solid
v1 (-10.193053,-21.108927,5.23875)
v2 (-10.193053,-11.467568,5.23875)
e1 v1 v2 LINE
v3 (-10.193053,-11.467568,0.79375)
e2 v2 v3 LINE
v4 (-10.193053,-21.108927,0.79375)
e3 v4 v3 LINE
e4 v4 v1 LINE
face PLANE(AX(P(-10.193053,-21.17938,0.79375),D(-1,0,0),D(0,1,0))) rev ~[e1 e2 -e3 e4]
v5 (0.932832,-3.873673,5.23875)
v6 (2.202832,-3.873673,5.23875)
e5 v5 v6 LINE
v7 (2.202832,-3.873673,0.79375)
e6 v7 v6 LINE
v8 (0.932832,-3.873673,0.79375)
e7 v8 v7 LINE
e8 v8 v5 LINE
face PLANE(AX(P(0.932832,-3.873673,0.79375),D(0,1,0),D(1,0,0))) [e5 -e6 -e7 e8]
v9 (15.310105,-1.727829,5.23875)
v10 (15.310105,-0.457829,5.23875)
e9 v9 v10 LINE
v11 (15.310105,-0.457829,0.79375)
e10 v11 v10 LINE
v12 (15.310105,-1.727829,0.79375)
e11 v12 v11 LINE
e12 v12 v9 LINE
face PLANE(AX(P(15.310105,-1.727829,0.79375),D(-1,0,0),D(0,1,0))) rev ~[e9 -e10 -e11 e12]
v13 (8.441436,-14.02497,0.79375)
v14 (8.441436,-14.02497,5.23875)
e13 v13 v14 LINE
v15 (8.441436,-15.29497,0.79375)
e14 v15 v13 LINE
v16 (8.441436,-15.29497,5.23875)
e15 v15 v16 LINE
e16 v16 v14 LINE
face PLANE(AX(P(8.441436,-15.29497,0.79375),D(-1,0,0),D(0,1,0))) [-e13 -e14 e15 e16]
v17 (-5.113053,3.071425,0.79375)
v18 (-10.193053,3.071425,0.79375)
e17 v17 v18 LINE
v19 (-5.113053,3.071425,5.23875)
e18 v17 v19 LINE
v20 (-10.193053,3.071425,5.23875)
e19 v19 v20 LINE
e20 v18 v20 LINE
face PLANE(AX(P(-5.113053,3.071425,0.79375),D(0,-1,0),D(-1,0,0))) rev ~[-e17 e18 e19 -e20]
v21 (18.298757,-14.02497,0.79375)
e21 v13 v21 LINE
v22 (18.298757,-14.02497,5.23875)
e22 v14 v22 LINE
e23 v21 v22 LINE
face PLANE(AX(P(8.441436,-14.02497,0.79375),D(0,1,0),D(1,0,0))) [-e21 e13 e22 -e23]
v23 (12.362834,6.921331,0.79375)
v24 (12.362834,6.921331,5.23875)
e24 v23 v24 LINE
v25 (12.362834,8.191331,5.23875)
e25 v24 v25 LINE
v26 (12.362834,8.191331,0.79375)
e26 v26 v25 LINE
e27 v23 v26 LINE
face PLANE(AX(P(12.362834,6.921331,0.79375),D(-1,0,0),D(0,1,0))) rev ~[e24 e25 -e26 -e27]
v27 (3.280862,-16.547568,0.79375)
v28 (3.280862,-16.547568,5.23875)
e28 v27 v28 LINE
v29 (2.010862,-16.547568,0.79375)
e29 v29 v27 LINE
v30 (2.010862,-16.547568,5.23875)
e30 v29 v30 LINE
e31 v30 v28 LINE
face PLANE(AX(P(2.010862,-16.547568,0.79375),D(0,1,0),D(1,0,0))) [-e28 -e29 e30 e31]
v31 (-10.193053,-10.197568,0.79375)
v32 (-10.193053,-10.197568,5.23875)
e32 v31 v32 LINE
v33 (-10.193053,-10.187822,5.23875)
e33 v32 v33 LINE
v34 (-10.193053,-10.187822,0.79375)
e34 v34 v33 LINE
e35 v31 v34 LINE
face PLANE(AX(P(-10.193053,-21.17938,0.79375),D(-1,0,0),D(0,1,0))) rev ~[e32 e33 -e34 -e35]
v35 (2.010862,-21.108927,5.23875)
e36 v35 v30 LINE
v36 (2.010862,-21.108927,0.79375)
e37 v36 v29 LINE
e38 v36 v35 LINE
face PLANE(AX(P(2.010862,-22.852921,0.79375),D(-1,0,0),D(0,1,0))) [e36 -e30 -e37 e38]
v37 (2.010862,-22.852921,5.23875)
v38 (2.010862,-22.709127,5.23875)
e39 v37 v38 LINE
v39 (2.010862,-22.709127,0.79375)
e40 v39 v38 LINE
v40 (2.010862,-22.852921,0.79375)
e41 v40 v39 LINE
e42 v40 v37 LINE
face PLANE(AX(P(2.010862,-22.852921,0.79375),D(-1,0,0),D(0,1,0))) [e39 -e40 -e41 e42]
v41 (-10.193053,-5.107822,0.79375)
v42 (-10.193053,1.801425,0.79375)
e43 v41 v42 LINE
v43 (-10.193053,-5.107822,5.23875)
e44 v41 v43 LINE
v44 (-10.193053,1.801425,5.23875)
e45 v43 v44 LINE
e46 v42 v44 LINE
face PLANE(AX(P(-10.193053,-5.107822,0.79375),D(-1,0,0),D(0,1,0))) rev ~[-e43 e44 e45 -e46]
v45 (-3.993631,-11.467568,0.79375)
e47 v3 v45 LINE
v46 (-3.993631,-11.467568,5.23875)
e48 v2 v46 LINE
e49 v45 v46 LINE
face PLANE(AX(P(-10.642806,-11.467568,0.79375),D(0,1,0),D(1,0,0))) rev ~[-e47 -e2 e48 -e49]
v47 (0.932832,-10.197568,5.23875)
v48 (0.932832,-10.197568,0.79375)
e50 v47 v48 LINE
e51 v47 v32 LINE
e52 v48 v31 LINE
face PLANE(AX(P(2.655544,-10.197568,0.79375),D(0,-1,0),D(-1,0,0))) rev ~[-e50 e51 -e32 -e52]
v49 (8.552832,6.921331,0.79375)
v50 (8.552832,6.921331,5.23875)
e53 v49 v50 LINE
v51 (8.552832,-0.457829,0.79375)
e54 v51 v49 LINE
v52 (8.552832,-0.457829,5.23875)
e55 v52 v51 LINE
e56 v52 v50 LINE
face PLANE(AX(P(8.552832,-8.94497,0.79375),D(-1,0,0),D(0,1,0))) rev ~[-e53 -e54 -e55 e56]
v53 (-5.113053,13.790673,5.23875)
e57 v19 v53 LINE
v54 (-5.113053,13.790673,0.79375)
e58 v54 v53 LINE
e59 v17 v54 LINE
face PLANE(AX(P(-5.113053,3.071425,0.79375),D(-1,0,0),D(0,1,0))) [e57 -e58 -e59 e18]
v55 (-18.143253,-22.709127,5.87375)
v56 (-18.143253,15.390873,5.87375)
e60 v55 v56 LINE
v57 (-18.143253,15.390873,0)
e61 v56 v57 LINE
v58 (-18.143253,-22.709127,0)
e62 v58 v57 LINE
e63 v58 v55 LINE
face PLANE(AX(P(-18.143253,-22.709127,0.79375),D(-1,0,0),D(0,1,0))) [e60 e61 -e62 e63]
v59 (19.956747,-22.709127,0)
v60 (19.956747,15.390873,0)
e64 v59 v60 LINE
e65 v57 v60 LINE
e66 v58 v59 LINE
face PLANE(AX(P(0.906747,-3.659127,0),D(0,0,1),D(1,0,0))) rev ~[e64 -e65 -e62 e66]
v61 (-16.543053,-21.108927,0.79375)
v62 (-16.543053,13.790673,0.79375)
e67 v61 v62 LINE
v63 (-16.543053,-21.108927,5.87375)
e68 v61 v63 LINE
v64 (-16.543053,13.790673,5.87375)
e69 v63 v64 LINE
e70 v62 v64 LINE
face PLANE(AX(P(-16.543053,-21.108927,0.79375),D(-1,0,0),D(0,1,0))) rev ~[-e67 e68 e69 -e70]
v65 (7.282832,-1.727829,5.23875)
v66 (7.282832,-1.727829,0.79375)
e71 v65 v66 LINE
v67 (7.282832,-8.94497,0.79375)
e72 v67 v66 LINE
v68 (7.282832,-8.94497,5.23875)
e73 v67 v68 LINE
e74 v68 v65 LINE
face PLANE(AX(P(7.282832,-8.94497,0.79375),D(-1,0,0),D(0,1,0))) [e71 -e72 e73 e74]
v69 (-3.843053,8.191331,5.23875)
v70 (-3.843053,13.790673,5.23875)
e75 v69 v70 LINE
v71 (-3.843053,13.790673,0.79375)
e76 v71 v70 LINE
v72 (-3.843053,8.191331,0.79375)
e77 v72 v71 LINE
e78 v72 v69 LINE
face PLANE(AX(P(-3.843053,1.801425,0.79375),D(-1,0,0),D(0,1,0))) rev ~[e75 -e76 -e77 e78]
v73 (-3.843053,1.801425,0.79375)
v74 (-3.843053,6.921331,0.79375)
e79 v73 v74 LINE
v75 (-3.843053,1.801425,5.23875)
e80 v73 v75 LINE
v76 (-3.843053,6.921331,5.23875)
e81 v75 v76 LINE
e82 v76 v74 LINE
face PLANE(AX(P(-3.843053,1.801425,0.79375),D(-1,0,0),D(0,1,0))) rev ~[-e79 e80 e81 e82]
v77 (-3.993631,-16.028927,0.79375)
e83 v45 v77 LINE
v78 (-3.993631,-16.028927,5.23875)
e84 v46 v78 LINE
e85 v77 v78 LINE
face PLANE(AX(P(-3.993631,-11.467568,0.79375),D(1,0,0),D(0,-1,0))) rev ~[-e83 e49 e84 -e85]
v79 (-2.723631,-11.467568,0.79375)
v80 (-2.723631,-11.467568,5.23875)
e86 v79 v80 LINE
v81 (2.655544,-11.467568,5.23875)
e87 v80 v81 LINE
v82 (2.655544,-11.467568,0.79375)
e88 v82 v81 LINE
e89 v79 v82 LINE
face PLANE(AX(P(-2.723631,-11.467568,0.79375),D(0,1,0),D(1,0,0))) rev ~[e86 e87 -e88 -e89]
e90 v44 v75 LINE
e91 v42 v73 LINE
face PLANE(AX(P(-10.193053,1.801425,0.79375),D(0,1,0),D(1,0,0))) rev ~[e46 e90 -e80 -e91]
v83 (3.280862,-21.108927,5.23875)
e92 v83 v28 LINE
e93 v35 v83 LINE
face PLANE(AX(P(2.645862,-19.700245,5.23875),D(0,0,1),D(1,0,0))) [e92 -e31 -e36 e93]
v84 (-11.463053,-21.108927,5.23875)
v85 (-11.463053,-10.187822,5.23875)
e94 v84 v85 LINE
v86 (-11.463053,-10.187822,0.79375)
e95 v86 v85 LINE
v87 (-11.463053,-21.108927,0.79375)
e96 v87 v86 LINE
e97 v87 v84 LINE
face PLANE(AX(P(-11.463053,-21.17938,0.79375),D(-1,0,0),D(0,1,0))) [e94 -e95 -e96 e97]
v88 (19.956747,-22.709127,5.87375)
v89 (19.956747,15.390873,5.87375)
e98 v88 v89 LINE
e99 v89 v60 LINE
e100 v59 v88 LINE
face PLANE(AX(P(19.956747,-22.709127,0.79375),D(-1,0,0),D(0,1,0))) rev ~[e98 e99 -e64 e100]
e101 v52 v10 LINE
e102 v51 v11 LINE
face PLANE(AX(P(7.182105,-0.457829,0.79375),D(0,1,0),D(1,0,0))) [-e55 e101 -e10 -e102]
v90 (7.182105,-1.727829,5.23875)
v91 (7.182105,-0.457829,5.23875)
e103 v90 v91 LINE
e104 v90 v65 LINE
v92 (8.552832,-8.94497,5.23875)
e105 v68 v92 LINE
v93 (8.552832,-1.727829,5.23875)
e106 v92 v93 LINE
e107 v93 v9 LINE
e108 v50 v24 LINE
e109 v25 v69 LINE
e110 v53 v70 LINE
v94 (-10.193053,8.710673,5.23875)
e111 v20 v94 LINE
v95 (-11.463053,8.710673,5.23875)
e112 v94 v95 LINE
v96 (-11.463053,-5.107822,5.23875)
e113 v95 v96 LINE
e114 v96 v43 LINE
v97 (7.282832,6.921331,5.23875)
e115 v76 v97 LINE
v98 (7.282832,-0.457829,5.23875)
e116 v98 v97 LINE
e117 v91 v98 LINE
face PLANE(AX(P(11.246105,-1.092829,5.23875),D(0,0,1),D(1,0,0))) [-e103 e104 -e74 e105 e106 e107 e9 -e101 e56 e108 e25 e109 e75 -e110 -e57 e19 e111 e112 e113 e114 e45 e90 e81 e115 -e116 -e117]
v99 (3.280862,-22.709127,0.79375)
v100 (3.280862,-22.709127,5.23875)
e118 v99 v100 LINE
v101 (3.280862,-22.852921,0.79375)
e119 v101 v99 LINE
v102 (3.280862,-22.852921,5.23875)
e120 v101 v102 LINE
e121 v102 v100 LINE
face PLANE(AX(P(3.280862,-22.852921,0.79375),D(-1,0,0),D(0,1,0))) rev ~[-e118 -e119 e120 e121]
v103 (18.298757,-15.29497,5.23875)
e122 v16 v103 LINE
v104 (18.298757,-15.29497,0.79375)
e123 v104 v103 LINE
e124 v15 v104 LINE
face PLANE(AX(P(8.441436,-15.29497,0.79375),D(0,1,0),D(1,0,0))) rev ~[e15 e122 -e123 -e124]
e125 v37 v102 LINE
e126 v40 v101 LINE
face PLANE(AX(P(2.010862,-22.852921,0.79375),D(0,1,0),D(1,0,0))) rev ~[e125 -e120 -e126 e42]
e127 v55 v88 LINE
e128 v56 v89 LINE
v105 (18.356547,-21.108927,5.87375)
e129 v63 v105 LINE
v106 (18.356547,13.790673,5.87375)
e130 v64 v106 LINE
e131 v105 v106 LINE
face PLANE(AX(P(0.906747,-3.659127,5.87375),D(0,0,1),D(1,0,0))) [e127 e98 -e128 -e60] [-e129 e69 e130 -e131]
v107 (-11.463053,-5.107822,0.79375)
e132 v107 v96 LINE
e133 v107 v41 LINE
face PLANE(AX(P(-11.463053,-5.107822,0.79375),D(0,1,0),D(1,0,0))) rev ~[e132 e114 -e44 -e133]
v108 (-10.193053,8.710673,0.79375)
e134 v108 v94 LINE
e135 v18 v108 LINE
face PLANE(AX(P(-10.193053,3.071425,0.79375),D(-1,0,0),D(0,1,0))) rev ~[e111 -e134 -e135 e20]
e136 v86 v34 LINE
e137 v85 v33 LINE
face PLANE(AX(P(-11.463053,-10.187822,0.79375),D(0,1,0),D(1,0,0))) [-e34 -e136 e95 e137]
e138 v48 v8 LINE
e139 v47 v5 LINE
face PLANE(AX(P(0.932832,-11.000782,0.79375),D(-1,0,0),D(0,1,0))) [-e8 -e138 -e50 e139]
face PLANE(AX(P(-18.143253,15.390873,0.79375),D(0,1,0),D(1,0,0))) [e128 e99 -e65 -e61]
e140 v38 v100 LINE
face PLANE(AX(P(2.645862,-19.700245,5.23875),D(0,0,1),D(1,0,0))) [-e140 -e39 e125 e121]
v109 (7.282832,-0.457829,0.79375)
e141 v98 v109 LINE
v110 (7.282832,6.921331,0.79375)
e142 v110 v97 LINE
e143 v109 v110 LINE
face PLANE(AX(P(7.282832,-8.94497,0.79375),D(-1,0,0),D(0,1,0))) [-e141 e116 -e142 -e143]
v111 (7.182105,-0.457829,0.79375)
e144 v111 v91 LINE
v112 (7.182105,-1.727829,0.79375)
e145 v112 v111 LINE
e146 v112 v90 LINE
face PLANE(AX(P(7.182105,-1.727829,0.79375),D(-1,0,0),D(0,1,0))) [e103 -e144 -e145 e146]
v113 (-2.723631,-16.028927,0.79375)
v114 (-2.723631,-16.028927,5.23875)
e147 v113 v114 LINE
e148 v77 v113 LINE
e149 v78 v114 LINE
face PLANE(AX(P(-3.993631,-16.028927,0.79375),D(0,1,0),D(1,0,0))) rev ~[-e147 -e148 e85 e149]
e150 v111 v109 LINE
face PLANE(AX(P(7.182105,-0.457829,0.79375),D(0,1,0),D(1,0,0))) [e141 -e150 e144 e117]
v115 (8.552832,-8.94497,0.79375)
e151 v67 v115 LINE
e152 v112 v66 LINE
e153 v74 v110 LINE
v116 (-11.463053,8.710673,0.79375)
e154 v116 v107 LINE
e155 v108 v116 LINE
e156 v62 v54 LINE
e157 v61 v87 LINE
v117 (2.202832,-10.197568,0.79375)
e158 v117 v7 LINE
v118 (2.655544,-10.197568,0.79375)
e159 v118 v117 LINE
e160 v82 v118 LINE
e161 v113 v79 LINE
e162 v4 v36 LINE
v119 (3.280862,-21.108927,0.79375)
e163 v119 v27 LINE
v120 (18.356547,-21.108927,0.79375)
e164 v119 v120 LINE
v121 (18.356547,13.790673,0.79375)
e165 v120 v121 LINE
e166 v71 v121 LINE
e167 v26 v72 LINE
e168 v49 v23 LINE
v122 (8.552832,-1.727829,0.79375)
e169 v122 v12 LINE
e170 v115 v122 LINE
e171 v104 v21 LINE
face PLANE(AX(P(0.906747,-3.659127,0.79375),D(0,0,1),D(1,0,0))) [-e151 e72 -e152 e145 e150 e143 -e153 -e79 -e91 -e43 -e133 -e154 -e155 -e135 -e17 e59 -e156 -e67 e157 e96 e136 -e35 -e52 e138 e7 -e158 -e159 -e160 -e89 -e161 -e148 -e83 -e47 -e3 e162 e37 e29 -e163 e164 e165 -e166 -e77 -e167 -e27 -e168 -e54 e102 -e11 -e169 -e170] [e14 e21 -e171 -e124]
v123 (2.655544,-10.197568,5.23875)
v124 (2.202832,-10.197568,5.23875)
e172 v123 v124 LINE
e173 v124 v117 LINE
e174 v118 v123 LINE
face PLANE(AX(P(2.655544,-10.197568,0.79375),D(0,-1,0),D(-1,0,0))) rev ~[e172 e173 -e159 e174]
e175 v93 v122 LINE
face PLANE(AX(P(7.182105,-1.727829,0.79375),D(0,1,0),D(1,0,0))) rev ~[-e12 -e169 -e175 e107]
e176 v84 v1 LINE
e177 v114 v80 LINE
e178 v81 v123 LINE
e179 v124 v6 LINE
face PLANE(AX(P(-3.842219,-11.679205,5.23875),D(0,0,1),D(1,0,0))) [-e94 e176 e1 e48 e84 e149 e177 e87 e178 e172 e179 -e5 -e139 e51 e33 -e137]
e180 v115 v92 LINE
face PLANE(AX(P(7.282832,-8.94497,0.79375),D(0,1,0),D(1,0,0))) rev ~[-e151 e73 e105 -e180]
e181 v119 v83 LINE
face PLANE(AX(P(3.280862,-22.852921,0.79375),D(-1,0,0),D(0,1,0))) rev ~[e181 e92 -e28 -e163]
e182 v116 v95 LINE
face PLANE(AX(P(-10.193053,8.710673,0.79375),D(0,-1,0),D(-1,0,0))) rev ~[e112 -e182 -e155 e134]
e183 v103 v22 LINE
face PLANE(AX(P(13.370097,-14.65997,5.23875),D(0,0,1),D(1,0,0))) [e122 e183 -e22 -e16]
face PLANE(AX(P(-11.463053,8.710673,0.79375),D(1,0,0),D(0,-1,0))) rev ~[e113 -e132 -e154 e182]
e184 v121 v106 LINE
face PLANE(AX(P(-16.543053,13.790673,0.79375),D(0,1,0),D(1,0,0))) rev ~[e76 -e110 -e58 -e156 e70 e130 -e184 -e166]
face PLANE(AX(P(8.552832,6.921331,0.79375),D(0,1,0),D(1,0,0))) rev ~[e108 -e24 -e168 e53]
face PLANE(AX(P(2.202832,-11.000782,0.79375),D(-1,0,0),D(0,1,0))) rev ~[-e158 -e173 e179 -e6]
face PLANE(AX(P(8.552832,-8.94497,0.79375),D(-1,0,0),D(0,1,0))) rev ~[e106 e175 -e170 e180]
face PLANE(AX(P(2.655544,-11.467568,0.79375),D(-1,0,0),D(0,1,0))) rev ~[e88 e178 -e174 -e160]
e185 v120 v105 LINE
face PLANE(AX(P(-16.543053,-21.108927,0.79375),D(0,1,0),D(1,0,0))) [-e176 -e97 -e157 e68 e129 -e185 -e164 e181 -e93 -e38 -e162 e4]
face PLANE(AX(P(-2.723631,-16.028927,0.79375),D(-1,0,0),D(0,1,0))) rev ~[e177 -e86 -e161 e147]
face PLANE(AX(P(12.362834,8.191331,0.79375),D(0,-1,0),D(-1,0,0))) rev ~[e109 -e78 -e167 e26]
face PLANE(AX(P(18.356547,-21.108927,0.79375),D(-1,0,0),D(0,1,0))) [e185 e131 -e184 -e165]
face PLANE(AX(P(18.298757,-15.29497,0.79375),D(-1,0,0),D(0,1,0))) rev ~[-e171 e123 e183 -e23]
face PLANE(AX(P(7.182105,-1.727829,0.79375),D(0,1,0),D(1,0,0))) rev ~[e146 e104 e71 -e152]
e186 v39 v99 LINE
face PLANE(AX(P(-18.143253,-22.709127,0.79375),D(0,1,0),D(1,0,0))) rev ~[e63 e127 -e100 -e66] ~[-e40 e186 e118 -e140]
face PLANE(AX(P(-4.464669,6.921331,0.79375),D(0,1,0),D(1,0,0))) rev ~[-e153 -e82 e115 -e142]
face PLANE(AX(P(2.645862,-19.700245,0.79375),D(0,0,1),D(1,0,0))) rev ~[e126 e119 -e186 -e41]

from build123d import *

# Parameters (mm, degrees)
F0_W      = 38.1
F0_H      = 38.1
F1_DEPTH  = 0.79375
F2_W      = 38.1
F2_H      = 38.1
F2_W_2    = 34.8996
F2_H_2    = 34.8996
F3_DEPTH  = 5.08
F4_W      = 1.27
F4_H      = 10.9915577808
F4_H_2    = 10.7192572
F5_DEPTH  = 4.445
F7_W      = 1.27
F7_H      = 6.305353716
F9_DEPTH  = 4.445
F8_W      = 1.27
F8_H      = 7.127109261
F8_H_2    = 15.866300866
F8_W_2    = 9.8573208662
F8_H_3    = 1.27
F10_DEPTH = 4.445
F11_W     = 8.128
F11_H     = 1.27
F12_DEPTH = 4.445


# Not quite as in the source:
# - a feature names something its author has since deleted; it is built from what else it names


with BuildPart() as f1:
    # F0 (on Top) → F1 (new body)
    with BuildSketch(Plane.XY):
        with Locations((0.9067468345, -3.6591270581)):
            Rectangle(F0_W, F0_H)
    extrude(amount=F1_DEPTH)

    # F2 (on face) → F3 (join)
    with BuildSketch(Plane.XY.offset(0.79375)):
        with Locations((0.9067468345, -3.6591270581)):
            Rectangle(F2_W, F2_H)
        with Locations((0.9067468345, -3.6591270581)):
            Rectangle(F2_W_2, F2_H_2, mode=Mode.SUBTRACT)
    extrude(amount=F3_DEPTH)

    # F4 (on face) → F5 (join)
    with BuildSketch(Plane.XY.offset(0.79375)):
        with Locations((-10.8280531655, -15.6836010049)):
            Rectangle(F4_W, F4_H)
        Polygon((-11.4630531655, -5.1078221145), (-10.1930531655, -5.1078221145), (-10.1930531655, 1.8014254137), (-10.1930531655, 3.0714254137), (-10.1930531655, 8.7106729419), (-11.4630531655, 8.7106729419), align=None)
        Polygon((-10.1930531655, 3.0714254137), (-10.1930531655, 1.8014254137), (-3.8430531655, 1.8014254137), (-3.8430531655, 3.0714254137), (-5.1130531655, 3.0714254137), align=None)
        with Locations((-4.4780531655, 8.4310540137)):
            Rectangle(F4_W, F4_H_2)
    extrude(amount=F5_DEPTH)

    # F7 (on face) → F9 (join)
    with BuildSketch(Plane.XY.offset(0.79375)):
        Polygon((2.6555440854, -10.197567645), (-10.6428060681, -10.197567645), (-10.6428060681, -11.467567645), (-3.9936309913, -11.467567645), (-3.9936309913, -16.0289270581), (-2.7236309913, -16.0289270581), (-2.7236309913, -11.467567645), (2.6555440854, -11.467567645), align=None)
        with Locations((2.6458618774, -19.700244503)):
            Rectangle(F7_W, F7_H)
    extrude(amount=F9_DEPTH)

    # F8 (on face) → F10 (join)
    with BuildSketch(Plane.XY.offset(0.79375)):
        with Locations((1.5678320881, -7.4372278345)):
            Rectangle(F8_W, F8_H)
        Polygon((12.3628337599, 8.1913313339), (-4.464668509, 8.1913313339), (-4.464668509, 6.9213313339), (7.2828320881, 6.9213313339), (8.5528320881, 6.9213313339), (12.3628337599, 6.9213313339), align=None)
        with Locations((7.9178320881, -1.0118190991)):
            Rectangle(F8_W, F8_H_2)
        with Locations((13.370096651, -14.6599695321)):
            Rectangle(F8_W_2, F8_H_3)
    extrude(amount=F10_DEPTH)

    # F11 (on face) → F12 (join)
    with BuildSketch(Plane.XY.offset(0.79375)):
        with Locations((11.246104741, -1.0928286647)):
            Rectangle(F11_W, F11_H)
    extrude(amount=F12_DEPTH)


solid = f1.part
